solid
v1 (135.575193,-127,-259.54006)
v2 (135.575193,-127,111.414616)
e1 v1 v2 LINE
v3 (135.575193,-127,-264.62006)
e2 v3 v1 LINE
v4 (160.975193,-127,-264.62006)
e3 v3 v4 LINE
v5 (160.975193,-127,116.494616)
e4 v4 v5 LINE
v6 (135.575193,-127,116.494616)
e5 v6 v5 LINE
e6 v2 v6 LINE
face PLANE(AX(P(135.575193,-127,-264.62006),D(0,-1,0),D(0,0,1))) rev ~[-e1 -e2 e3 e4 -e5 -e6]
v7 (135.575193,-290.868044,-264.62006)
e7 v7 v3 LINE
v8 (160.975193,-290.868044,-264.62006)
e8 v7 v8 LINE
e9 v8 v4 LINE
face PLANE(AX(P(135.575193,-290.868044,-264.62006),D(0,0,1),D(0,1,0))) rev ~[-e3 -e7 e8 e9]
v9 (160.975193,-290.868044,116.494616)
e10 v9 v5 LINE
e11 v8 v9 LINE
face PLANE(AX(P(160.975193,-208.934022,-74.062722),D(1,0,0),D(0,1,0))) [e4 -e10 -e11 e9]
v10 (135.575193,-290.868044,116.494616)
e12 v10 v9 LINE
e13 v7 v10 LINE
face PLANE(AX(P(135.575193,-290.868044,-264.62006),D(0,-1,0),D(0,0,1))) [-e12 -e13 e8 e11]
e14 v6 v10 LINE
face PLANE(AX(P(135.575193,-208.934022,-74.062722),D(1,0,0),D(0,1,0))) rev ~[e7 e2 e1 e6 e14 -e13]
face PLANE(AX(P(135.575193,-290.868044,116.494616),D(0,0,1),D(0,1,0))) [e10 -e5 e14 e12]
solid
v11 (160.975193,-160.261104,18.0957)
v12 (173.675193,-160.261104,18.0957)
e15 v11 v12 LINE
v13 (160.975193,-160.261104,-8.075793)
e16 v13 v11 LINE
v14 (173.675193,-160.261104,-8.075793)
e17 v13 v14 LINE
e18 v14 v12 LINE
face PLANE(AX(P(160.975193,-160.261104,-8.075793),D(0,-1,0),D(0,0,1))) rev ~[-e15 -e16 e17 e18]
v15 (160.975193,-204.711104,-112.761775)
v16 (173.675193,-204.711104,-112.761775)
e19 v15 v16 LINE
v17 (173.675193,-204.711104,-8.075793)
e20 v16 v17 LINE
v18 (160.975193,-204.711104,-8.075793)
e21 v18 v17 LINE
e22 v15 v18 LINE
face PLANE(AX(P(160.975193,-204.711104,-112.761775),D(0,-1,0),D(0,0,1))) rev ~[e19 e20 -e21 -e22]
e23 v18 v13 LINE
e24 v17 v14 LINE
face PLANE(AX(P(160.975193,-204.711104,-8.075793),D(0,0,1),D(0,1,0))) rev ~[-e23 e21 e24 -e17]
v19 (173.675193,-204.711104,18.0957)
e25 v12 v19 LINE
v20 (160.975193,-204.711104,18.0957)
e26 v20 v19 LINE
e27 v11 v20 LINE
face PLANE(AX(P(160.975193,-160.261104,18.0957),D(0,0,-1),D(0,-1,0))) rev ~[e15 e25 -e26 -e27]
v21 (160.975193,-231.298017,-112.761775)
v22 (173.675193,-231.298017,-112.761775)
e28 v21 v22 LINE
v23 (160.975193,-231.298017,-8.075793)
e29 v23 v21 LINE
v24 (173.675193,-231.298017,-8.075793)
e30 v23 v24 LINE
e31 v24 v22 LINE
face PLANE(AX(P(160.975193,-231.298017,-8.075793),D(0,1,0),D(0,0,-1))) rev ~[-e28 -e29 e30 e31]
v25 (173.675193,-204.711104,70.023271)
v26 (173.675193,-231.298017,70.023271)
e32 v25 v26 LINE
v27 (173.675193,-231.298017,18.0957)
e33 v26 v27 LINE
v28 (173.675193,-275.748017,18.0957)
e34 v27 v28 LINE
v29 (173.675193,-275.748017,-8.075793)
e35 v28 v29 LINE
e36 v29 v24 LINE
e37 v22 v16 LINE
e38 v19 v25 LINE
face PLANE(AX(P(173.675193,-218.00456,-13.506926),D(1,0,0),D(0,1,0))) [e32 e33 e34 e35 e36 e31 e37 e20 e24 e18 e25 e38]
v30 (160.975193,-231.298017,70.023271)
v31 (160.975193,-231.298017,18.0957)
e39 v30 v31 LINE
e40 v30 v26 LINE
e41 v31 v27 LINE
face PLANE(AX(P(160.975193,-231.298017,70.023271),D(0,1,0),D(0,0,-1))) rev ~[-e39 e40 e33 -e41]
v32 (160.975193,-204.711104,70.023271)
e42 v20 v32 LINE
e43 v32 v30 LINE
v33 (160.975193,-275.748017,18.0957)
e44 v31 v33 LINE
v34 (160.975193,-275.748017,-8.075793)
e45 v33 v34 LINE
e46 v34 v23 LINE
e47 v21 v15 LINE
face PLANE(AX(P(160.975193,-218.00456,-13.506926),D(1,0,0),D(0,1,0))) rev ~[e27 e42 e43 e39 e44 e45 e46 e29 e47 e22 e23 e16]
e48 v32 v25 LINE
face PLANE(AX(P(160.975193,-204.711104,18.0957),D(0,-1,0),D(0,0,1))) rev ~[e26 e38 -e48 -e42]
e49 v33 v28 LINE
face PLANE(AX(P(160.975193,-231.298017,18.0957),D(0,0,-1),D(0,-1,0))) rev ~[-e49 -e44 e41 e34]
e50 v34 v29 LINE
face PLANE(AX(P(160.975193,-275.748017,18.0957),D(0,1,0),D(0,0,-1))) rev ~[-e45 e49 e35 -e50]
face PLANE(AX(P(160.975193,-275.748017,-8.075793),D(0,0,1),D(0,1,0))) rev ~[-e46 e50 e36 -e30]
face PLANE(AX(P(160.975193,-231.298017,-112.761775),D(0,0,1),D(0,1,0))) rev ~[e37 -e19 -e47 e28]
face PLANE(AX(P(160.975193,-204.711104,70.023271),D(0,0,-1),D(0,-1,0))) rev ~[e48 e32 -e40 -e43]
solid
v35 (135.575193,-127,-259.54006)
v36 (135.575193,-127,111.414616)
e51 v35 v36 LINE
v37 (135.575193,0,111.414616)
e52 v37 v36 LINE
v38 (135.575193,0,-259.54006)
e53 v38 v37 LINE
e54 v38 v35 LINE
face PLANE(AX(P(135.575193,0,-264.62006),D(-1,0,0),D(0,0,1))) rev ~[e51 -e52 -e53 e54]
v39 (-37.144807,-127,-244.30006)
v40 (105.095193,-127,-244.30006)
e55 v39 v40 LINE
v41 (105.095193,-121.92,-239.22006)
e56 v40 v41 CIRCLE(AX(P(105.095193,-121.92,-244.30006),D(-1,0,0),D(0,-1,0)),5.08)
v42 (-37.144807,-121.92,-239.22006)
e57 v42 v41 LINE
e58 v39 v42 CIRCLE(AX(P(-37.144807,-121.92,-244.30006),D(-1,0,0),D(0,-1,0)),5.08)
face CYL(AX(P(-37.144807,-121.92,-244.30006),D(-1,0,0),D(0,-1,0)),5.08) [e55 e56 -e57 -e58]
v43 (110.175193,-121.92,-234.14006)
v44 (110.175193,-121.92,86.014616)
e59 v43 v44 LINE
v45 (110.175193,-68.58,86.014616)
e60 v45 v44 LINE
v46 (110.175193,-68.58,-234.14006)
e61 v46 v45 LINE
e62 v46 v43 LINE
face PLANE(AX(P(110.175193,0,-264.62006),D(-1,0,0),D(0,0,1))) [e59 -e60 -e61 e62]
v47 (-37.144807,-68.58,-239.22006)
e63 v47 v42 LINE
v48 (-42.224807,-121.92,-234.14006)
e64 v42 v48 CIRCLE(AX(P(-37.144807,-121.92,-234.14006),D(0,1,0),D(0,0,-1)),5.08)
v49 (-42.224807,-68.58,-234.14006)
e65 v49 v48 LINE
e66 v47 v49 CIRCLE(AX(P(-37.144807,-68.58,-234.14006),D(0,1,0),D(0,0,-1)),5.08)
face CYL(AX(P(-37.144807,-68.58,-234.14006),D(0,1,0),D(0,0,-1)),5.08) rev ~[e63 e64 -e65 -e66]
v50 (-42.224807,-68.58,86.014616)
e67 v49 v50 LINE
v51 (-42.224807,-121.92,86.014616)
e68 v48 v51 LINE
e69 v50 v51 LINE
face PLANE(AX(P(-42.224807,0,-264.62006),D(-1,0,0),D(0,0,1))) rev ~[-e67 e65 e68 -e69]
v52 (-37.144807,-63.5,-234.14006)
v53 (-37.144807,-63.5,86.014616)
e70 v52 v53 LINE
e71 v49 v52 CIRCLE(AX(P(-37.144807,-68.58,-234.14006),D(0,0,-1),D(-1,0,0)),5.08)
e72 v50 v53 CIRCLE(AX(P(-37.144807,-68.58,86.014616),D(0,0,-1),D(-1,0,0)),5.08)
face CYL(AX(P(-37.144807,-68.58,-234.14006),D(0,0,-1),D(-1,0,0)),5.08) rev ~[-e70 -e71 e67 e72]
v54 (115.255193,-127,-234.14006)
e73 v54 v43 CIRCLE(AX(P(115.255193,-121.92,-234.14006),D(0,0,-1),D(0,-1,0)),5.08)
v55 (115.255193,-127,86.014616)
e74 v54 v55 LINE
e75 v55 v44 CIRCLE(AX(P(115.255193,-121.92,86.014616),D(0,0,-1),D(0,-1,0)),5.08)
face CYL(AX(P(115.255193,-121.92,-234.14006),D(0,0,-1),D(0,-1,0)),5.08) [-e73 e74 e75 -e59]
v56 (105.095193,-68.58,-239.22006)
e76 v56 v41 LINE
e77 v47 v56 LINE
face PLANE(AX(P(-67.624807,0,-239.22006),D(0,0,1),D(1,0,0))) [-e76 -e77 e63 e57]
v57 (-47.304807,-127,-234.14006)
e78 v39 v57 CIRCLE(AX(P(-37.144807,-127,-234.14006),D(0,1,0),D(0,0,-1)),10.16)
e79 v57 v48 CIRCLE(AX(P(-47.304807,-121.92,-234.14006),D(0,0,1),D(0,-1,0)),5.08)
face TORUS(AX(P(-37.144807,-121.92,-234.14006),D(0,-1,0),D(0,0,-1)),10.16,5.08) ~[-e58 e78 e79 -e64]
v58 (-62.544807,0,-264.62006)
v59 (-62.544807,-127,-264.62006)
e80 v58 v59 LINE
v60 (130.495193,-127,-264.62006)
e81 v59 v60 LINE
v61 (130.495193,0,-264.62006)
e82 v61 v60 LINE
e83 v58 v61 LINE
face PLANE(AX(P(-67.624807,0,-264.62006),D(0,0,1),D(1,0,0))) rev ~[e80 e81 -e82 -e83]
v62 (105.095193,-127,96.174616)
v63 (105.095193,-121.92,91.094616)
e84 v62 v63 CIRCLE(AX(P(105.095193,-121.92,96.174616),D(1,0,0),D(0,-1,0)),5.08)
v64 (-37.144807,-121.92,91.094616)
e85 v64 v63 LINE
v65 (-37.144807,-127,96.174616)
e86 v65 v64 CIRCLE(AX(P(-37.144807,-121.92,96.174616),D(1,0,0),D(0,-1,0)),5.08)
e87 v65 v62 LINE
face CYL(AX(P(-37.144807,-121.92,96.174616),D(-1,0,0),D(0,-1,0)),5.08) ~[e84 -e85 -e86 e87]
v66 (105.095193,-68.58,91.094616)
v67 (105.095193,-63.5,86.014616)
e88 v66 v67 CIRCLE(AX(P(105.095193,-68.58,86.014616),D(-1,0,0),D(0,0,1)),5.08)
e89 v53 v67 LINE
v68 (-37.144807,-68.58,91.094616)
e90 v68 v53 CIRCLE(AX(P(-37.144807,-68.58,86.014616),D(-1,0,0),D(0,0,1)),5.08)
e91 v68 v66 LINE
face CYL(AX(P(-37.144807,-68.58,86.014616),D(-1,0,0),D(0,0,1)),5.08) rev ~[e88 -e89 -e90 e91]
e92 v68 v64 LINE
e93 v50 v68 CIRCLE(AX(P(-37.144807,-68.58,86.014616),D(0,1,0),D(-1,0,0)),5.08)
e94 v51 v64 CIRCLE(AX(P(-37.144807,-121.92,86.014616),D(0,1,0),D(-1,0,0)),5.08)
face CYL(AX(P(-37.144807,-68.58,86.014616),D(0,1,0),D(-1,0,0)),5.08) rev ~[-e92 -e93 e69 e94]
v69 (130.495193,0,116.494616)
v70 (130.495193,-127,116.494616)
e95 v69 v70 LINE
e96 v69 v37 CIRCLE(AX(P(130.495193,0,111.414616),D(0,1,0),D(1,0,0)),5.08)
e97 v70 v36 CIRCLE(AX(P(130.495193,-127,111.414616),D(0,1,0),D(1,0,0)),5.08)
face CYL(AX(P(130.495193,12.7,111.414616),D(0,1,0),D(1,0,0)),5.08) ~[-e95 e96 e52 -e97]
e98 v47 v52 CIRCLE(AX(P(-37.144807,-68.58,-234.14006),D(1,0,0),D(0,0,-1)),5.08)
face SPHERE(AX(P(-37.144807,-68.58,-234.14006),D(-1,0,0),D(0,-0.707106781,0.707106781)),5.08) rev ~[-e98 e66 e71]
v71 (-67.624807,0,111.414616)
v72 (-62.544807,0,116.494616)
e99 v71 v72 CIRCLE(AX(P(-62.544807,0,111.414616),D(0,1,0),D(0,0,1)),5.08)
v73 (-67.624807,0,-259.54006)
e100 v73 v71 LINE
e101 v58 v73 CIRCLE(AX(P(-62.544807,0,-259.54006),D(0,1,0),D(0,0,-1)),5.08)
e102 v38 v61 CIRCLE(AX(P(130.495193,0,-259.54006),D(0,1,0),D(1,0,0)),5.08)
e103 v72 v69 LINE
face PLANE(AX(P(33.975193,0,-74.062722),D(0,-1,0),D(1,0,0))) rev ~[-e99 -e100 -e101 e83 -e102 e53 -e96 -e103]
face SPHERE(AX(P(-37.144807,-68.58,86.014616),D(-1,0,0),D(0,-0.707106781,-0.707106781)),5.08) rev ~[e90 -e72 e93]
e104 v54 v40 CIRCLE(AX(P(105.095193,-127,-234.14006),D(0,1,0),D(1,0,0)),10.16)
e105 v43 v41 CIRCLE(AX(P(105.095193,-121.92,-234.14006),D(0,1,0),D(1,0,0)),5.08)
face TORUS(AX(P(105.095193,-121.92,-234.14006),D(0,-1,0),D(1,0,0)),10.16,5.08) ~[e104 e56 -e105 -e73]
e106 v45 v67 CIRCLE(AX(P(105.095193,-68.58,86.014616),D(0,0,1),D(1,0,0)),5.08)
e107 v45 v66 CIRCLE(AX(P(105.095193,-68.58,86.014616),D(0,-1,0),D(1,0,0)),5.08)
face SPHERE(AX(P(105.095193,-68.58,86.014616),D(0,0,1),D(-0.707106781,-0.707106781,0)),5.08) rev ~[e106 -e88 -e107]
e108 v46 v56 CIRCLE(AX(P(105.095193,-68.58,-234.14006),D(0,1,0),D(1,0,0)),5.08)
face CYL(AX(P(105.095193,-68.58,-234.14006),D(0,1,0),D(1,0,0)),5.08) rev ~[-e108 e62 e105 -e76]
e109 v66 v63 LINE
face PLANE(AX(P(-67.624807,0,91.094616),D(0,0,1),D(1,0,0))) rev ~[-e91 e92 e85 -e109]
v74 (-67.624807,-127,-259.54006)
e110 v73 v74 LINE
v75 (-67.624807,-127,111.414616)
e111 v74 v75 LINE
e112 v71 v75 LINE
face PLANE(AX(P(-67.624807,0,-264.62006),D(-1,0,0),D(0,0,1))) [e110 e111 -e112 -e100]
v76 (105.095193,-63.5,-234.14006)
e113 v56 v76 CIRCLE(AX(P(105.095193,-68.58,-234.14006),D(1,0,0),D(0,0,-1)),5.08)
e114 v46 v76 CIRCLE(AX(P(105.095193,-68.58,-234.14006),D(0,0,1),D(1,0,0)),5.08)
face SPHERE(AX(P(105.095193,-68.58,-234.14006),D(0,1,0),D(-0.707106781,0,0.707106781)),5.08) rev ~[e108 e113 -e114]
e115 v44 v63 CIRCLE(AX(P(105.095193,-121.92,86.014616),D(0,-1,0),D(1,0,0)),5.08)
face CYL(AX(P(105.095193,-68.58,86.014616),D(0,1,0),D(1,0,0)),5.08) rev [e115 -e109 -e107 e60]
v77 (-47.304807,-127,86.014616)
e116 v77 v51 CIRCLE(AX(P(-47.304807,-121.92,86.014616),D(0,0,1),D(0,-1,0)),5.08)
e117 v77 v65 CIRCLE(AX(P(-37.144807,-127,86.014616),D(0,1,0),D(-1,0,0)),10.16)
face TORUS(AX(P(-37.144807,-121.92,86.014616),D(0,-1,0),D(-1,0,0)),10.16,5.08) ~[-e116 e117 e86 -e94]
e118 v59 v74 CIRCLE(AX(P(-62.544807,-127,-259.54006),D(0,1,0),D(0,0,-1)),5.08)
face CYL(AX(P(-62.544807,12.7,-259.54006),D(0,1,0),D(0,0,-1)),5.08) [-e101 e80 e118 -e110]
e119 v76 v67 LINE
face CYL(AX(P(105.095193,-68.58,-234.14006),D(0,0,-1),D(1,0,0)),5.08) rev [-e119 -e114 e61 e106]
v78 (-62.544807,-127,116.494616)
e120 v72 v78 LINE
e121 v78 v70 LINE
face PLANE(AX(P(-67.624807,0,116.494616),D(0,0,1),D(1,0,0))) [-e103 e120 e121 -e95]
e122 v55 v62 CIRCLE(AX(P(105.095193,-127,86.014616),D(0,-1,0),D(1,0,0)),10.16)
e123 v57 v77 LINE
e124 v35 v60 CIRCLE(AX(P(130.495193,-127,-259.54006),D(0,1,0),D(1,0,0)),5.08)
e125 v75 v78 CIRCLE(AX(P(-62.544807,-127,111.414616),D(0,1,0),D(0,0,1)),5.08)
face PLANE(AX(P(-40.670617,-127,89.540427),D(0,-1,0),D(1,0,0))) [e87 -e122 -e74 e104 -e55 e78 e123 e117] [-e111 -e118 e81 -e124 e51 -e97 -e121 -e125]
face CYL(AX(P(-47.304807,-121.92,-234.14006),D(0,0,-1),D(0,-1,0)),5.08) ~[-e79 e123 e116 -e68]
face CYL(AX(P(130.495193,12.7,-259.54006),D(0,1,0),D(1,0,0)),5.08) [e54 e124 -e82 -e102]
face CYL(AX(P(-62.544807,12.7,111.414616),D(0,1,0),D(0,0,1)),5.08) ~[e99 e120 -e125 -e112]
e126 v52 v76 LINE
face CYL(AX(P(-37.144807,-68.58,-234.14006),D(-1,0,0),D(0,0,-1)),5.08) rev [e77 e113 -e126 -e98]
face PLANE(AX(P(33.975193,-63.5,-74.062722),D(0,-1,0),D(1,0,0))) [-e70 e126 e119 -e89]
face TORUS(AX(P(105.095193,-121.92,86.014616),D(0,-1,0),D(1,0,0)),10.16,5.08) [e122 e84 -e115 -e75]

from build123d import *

# Parameters (mm, degrees)
F0_W         = 203.2
F0_H         = 381.1146762907
F1_DEPTH     = 127
F2_T         = -25.4
F3_W         = 163.8680438995
F3_H         = 381.1146762907
F4_DEPTH     = 25.4
F5_W         = 152.4
F5_H         = 330.3146762907
F6_DEPTH     = 38.1
F7_T1_DEPTH  = 320.1546762907
F7_T3_DEPTH  = 142.24
F7_T5_DEPTH  = 58.42
F7_S9_W      = 5.08
F7_S9_H      = 5.08
F7_T10_DEPTH = 5.08
F7_S15_W     = 5.08
F7_S15_H     = 5.08
F7_T16_DEPTH = 5.08
F7_S21_W     = 5.08
F7_S21_H     = 5.08
F7_T22_DEPTH = 5.08
F7_S27_W     = 5.08
F7_S27_H     = 5.08
F7_T28_DEPTH = 5.08
F7_T31_DEPTH = 152.4
F7_T33_DEPTH = 142.24
F7_T35_DEPTH = 320.1546762907
F7_T38_ANGLE = 90
F7_T40_ANGLE = 90
F7_T42_ANGLE = 90
F7_T44_ANGLE = 90
F9_DEPTH     = 12.7


# Not quite as in the source:
# - a fillet or chamfer that OpenCascade refuses, or shapes differently, is made with other operations: its cross-section is extruded or revolved along the edge and cut away or added


with BuildPart() as f1:
    # F0 (on Front) → F1 (new body)
    with BuildSketch(Plane.XZ):
        with Locations((33.975193277, -74.0627218038)):
            Rectangle(F0_W, F0_H)
    extrude(amount=F1_DEPTH)

    # F2
    f2_openings = [f1.faces().sort_by_distance(p)[0] for p in [
        (33.975193, -127, -74.062722),
    ]]
    offset(amount=F2_T, openings=f2_openings)

    # F3 (on face) → F4 (join)
    with BuildSketch(Plane.YZ.offset(135.575193277)):
        with Locations((-208.9340219498, -74.0627218038)):
            Rectangle(F3_W, F3_H)
    extrude(amount=F4_DEPTH)

    # F5 (on face) → F6 (join)
    with BuildSketch(Plane.XZ.offset(25.4)):
        with Locations((33.975193277, -74.0627218038)):
            Rectangle(F5_W, F5_H)
    extrude(amount=F6_DEPTH)

    # F7: fillet of radius 5.08 on 16 edges, made by hand

    # F7_s2 → F7_t1 (join)
    with BuildSketch(Plane.XY.offset(-234.1400599492)):
        with BuildLine():
            ThreePointArc((-42.224806723, -68.58), (-40.7369091714, -64.9878975516), (-37.144806723, -63.5))
            Line((-37.144806723, -63.5), (-42.224806723, -63.5))
            Line((-42.224806723, -63.5), (-42.224806723, -68.58))
        make_face()
        with BuildLine():
            ThreePointArc((110.175193277, -68.58), (108.6872957254, -64.9878975516), (105.095193277, -63.5))
            Line((105.095193277, -63.5), (110.175193277, -63.5))
            Line((110.175193277, -63.5), (110.175193277, -68.58))
        make_face()
    extrude(amount=F7_T1_DEPTH)

    # F7_s4 → F7_t3 (join)
    with BuildSketch(Plane.YZ.offset(-37.144806723)):
        with BuildLine():
            ThreePointArc((-68.58, 91.0946163416), (-64.9878975516, 89.60671879), (-63.5, 86.0146163416))
            Line((-63.5, 86.0146163416), (-63.5, 91.0946163416))
            Line((-63.5, 91.0946163416), (-68.58, 91.0946163416))
        make_face()
        with BuildLine():
            ThreePointArc((-68.58, -239.2200599492), (-64.9878975516, -237.7321623976), (-63.5, -234.1400599492))
            Line((-63.5, -234.1400599492), (-63.5, -239.2200599492))
            Line((-63.5, -239.2200599492), (-68.58, -239.2200599492))
        make_face()
    extrude(amount=F7_T3_DEPTH)

    # F7_s6 → F7_t5 (join)
    with BuildSketch(Plane.XZ.offset(68.58)):
        with BuildLine():
            ThreePointArc((-42.224806723, 86.0146163416), (-40.7369091714, 89.60671879), (-37.144806723, 91.0946163416))
            Line((-37.144806723, 91.0946163416), (-42.224806723, 91.0946163416))
            Line((-42.224806723, 91.0946163416), (-42.224806723, 86.0146163416))
        make_face()
        with BuildLine():
            ThreePointArc((110.175193277, 86.0146163416), (108.6872957254, 89.60671879), (105.095193277, 91.0946163416))
            Line((105.095193277, 91.0946163416), (110.175193277, 91.0946163416))
            Line((110.175193277, 91.0946163416), (110.175193277, 86.0146163416))
        make_face()
        with BuildLine():
            ThreePointArc((110.175193277, -234.1400599492), (108.6872957254, -237.7321623976), (105.095193277, -239.2200599492))
            Line((105.095193277, -239.2200599492), (110.175193277, -239.2200599492))
            Line((110.175193277, -239.2200599492), (110.175193277, -234.1400599492))
        make_face()
        with BuildLine():
            ThreePointArc((-37.144806723, -239.2200599492), (-40.7369091714, -237.7321623976), (-42.224806723, -234.1400599492))
            Line((-42.224806723, -234.1400599492), (-42.224806723, -239.2200599492))
            Line((-42.224806723, -239.2200599492), (-37.144806723, -239.2200599492))
        make_face()
    extrude(amount=F7_T5_DEPTH)


with BuildPart() as f7_tool8:
    # F7_s9 → F7_t10 (new body)
    with BuildSketch(Plane.YZ.offset(-37.144806723)):
        with Locations((-66.04, 88.5546163416)):
            Rectangle(F7_S9_W, F7_S9_H)
    extrude(amount=-F7_T10_DEPTH)

    # F7_s11 → F7_t12 (revolve, cut)
    with BuildSketch(Plane(origin=(-37.144806723, -68.58, 86.0146163416), x_dir=(0, -0.7071067812, -0.7071067812), z_dir=(0, 0.7071067812, -0.7071067812))):
        with BuildLine():
            ThreePointArc((0, -5.08), (5.08, 0), (0, 5.08))
            Line((0, 5.08), (0, -5.08))
        make_face()
    revolve(axis=Axis((-37.144806723, -68.58, 86.0146163416), (-1, 0, 0)), mode=Mode.SUBTRACT)


with BuildPart() as f1_1:
    add(f1.part)

    # F7_t7: union F7_tool8
    add(f7_tool8.part)


with BuildPart() as f7_tool14:
    # F7_s15 → F7_t16 (new body)
    with BuildSketch(Plane.YZ.offset(-37.144806723)):
        with Locations((-66.04, -236.6800599492)):
            Rectangle(F7_S15_W, F7_S15_H)
    extrude(amount=-F7_T16_DEPTH)

    # F7_s17 → F7_t18 (revolve, cut)
    with BuildSketch(Plane(origin=(-37.144806723, -68.58, -234.1400599492), x_dir=(0, -0.7071067812, 0.7071067812), z_dir=(0, -0.7071067812, -0.7071067812))):
        with BuildLine():
            ThreePointArc((0, -5.08), (5.08, 0), (0, 5.08))
            Line((0, 5.08), (0, -5.08))
        make_face()
    revolve(axis=Axis((-37.144806723, -68.58, -234.1400599492), (-1, 0, 0)), mode=Mode.SUBTRACT)


with BuildPart() as f1_2:
    add(f1_1.part)

    # F7_t13: union F7_tool14
    add(f7_tool14.part)


with BuildPart() as f7_tool20:
    # F7_s21 → F7_t22 (new body)
    with BuildSketch(Plane.XY.offset(86.0146163416)):
        with Locations((107.635193277, -66.04)):
            Rectangle(F7_S21_W, F7_S21_H)
    extrude(amount=F7_T22_DEPTH)

    # F7_s23 → F7_t24 (revolve, cut)
    with BuildSketch(Plane(origin=(105.095193277, -68.58, 86.0146163416), x_dir=(-0.7071067812, -0.7071067812, 0), z_dir=(-0.7071067812, 0.7071067812, 0))):
        with BuildLine():
            ThreePointArc((0, -5.08), (5.08, 0), (0, 5.08))
            Line((0, 5.08), (0, -5.08))
        make_face()
    revolve(axis=Axis((105.095193277, -68.58, 86.0146163416), (0, 0, 1)), mode=Mode.SUBTRACT)


with BuildPart() as f1_3:
    add(f1_2.part)

    # F7_t19: union F7_tool20
    add(f7_tool20.part)


with BuildPart() as f7_tool26:
    # F7_s27 → F7_t28 (new body)
    with BuildSketch(Plane.XZ.offset(68.58)):
        with Locations((107.635193277, -236.6800599492)):
            Rectangle(F7_S27_W, F7_S27_H)
    extrude(amount=-F7_T28_DEPTH)

    # F7_s29 → F7_t30 (revolve, cut)
    with BuildSketch(Plane(origin=(105.095193277, -68.58, -234.1400599492), x_dir=(-0.7071067812, 0, 0.7071067812), z_dir=(-0.7071067812, 0, -0.7071067812))):
        with BuildLine():
            ThreePointArc((0, -5.08), (5.08, 0), (0, 5.08))
            Line((0, 5.08), (0, -5.08))
        make_face()
    revolve(axis=Axis((105.095193277, -68.58, -234.1400599492), (0, 1, 0)), mode=Mode.SUBTRACT)


with BuildPart() as f1_4:
    add(f1_3.part)

    # F7_t25: union F7_tool26
    add(f7_tool26.part)

    # F7_s32 → F7_t31 (cut)
    with BuildSketch(Plane.XZ.offset(-12.7)):
        with BuildLine():
            ThreePointArc((-62.544806723, -264.6200599492), (-66.1369091714, -263.1321623976), (-67.624806723, -259.5400599492))
            Line((-67.624806723, -259.5400599492), (-67.624806723, -264.6200599492))
            Line((-67.624806723, -264.6200599492), (-62.544806723, -264.6200599492))
        make_face()
        with BuildLine():
            ThreePointArc((135.575193277, -259.5400599492), (134.0872957254, -263.1321623976), (130.495193277, -264.6200599492))
            Line((130.495193277, -264.6200599492), (135.575193277, -264.6200599492))
            Line((135.575193277, -264.6200599492), (135.575193277, -259.5400599492))
        make_face()
        with BuildLine():
            ThreePointArc((135.575193277, 111.4146163416), (134.0872957254, 115.00671879), (130.495193277, 116.4946163416))
            Line((130.495193277, 116.4946163416), (135.575193277, 116.4946163416))
            Line((135.575193277, 116.4946163416), (135.575193277, 111.4146163416))
        make_face()
        with BuildLine():
            ThreePointArc((-62.544806723, 116.4946163416), (-66.1369091714, 115.00671879), (-67.624806723, 111.4146163416))
            Line((-67.624806723, 111.4146163416), (-67.624806723, 116.4946163416))
            Line((-67.624806723, 116.4946163416), (-62.544806723, 116.4946163416))
        make_face()
    extrude(amount=F7_T31_DEPTH, mode=Mode.SUBTRACT)

    # F7_s34 → F7_t33 (cut)
    with BuildSketch(Plane.YZ.offset(-37.144806723)):
        with BuildLine():
            ThreePointArc((-127, 96.1746163416), (-125.5121024484, 92.5825138932), (-121.92, 91.0946163416))
            Line((-121.92, 91.0946163416), (-127, 91.0946163416))
            Line((-127, 91.0946163416), (-127, 96.1746163416))
        make_face()
        with BuildLine():
            ThreePointArc((-127, -244.3000599492), (-125.5121024484, -240.7079575007), (-121.92, -239.2200599492))
            Line((-121.92, -239.2200599492), (-127, -239.2200599492))
            Line((-127, -239.2200599492), (-127, -244.3000599492))
        make_face()
    extrude(amount=F7_T33_DEPTH, mode=Mode.SUBTRACT)

    # F7_s36 → F7_t35 (cut)
    with BuildSketch(Plane.XY.offset(-234.1400599492)):
        with BuildLine():
            ThreePointArc((115.255193277, -127), (111.6630908286, -125.5121024484), (110.175193277, -121.92))
            Line((110.175193277, -121.92), (110.175193277, -127))
            Line((110.175193277, -127), (115.255193277, -127))
        make_face()
        with BuildLine():
            ThreePointArc((-47.304806723, -127), (-43.7127042746, -125.5121024484), (-42.224806723, -121.92))
            Line((-42.224806723, -121.92), (-42.224806723, -127))
            Line((-42.224806723, -127), (-47.304806723, -127))
        make_face()
    extrude(amount=F7_T35_DEPTH, mode=Mode.SUBTRACT)

    # F7_s37 → F7_t38 (revolve, cut)
    with BuildSketch(Plane.XY.offset(86.0146163416)):
        with BuildLine():
            ThreePointArc((-47.304806723, -127), (-43.7127042746, -125.5121024484), (-42.224806723, -121.92))
            Line((-42.224806723, -121.92), (-42.224806723, -127))
            Line((-42.224806723, -127), (-47.304806723, -127))
        make_face()
    revolve(axis=Axis((-37.144806723, -127, 86.0146163416), (0, 1, 0)), revolution_arc=F7_T38_ANGLE, mode=Mode.SUBTRACT)

    # F7_s39 → F7_t40 (revolve, cut)
    with BuildSketch(Plane.YZ.offset(-37.144806723)):
        with BuildLine():
            ThreePointArc((-127, -244.3000599492), (-125.5121024484, -240.7079575007), (-121.92, -239.2200599492))
            Line((-121.92, -239.2200599492), (-127, -239.2200599492))
            Line((-127, -239.2200599492), (-127, -244.3000599492))
        make_face()
    revolve(axis=Axis((-37.144806723, -127, -234.1400599492), (0, 1, 0)), revolution_arc=F7_T40_ANGLE, mode=Mode.SUBTRACT)

    # F7_s41 → F7_t42 (revolve, cut)
    with BuildSketch(Plane.XY.offset(-234.1400599492)):
        with BuildLine():
            ThreePointArc((115.255193277, -127), (111.6630908286, -125.5121024484), (110.175193277, -121.92))
            Line((110.175193277, -121.92), (110.175193277, -127))
            Line((110.175193277, -127), (115.255193277, -127))
        make_face()
    revolve(axis=Axis((105.095193277, -127, -234.1400599492), (0, 1, 0)), revolution_arc=F7_T42_ANGLE, mode=Mode.SUBTRACT)

    # F7_s43 → F7_t44 (revolve, cut)
    with BuildSketch(Plane.XY.offset(86.0146163416)):
        with BuildLine():
            ThreePointArc((115.255193277, -127), (111.6630908286, -125.5121024484), (110.175193277, -121.92))
            Line((110.175193277, -121.92), (110.175193277, -127))
            Line((110.175193277, -127), (115.255193277, -127))
        make_face()
    revolve(axis=Axis((105.095193277, -127, 86.0146163416), (0, -1, 0)), revolution_arc=F7_T44_ANGLE, mode=Mode.SUBTRACT)


with BuildPart() as f9:
    # F8 (on face) → F9 (new body)
    with BuildSketch(Plane.YZ.offset(160.975193277)):
        Polygon((-204.7111040329, 70.0232706935), (-231.2980165388, 70.0232706935), (-231.2980165388, 18.0956996665), (-275.7480165388, 18.0956996665), (-275.7480165388, -8.0757932739), (-231.2980165388, -8.0757932739), (-231.2980165388, -112.7617754013), (-204.7111040329, -112.7617754013), (-204.7111040329, -8.0757932739), (-160.2611040329, -8.0757932739), (-160.2611040329, 18.0956996665), (-204.7111040329, 18.0956996665), align=None)
    extrude(amount=F9_DEPTH)


solid = Compound([f1_4.part, f9.part])
